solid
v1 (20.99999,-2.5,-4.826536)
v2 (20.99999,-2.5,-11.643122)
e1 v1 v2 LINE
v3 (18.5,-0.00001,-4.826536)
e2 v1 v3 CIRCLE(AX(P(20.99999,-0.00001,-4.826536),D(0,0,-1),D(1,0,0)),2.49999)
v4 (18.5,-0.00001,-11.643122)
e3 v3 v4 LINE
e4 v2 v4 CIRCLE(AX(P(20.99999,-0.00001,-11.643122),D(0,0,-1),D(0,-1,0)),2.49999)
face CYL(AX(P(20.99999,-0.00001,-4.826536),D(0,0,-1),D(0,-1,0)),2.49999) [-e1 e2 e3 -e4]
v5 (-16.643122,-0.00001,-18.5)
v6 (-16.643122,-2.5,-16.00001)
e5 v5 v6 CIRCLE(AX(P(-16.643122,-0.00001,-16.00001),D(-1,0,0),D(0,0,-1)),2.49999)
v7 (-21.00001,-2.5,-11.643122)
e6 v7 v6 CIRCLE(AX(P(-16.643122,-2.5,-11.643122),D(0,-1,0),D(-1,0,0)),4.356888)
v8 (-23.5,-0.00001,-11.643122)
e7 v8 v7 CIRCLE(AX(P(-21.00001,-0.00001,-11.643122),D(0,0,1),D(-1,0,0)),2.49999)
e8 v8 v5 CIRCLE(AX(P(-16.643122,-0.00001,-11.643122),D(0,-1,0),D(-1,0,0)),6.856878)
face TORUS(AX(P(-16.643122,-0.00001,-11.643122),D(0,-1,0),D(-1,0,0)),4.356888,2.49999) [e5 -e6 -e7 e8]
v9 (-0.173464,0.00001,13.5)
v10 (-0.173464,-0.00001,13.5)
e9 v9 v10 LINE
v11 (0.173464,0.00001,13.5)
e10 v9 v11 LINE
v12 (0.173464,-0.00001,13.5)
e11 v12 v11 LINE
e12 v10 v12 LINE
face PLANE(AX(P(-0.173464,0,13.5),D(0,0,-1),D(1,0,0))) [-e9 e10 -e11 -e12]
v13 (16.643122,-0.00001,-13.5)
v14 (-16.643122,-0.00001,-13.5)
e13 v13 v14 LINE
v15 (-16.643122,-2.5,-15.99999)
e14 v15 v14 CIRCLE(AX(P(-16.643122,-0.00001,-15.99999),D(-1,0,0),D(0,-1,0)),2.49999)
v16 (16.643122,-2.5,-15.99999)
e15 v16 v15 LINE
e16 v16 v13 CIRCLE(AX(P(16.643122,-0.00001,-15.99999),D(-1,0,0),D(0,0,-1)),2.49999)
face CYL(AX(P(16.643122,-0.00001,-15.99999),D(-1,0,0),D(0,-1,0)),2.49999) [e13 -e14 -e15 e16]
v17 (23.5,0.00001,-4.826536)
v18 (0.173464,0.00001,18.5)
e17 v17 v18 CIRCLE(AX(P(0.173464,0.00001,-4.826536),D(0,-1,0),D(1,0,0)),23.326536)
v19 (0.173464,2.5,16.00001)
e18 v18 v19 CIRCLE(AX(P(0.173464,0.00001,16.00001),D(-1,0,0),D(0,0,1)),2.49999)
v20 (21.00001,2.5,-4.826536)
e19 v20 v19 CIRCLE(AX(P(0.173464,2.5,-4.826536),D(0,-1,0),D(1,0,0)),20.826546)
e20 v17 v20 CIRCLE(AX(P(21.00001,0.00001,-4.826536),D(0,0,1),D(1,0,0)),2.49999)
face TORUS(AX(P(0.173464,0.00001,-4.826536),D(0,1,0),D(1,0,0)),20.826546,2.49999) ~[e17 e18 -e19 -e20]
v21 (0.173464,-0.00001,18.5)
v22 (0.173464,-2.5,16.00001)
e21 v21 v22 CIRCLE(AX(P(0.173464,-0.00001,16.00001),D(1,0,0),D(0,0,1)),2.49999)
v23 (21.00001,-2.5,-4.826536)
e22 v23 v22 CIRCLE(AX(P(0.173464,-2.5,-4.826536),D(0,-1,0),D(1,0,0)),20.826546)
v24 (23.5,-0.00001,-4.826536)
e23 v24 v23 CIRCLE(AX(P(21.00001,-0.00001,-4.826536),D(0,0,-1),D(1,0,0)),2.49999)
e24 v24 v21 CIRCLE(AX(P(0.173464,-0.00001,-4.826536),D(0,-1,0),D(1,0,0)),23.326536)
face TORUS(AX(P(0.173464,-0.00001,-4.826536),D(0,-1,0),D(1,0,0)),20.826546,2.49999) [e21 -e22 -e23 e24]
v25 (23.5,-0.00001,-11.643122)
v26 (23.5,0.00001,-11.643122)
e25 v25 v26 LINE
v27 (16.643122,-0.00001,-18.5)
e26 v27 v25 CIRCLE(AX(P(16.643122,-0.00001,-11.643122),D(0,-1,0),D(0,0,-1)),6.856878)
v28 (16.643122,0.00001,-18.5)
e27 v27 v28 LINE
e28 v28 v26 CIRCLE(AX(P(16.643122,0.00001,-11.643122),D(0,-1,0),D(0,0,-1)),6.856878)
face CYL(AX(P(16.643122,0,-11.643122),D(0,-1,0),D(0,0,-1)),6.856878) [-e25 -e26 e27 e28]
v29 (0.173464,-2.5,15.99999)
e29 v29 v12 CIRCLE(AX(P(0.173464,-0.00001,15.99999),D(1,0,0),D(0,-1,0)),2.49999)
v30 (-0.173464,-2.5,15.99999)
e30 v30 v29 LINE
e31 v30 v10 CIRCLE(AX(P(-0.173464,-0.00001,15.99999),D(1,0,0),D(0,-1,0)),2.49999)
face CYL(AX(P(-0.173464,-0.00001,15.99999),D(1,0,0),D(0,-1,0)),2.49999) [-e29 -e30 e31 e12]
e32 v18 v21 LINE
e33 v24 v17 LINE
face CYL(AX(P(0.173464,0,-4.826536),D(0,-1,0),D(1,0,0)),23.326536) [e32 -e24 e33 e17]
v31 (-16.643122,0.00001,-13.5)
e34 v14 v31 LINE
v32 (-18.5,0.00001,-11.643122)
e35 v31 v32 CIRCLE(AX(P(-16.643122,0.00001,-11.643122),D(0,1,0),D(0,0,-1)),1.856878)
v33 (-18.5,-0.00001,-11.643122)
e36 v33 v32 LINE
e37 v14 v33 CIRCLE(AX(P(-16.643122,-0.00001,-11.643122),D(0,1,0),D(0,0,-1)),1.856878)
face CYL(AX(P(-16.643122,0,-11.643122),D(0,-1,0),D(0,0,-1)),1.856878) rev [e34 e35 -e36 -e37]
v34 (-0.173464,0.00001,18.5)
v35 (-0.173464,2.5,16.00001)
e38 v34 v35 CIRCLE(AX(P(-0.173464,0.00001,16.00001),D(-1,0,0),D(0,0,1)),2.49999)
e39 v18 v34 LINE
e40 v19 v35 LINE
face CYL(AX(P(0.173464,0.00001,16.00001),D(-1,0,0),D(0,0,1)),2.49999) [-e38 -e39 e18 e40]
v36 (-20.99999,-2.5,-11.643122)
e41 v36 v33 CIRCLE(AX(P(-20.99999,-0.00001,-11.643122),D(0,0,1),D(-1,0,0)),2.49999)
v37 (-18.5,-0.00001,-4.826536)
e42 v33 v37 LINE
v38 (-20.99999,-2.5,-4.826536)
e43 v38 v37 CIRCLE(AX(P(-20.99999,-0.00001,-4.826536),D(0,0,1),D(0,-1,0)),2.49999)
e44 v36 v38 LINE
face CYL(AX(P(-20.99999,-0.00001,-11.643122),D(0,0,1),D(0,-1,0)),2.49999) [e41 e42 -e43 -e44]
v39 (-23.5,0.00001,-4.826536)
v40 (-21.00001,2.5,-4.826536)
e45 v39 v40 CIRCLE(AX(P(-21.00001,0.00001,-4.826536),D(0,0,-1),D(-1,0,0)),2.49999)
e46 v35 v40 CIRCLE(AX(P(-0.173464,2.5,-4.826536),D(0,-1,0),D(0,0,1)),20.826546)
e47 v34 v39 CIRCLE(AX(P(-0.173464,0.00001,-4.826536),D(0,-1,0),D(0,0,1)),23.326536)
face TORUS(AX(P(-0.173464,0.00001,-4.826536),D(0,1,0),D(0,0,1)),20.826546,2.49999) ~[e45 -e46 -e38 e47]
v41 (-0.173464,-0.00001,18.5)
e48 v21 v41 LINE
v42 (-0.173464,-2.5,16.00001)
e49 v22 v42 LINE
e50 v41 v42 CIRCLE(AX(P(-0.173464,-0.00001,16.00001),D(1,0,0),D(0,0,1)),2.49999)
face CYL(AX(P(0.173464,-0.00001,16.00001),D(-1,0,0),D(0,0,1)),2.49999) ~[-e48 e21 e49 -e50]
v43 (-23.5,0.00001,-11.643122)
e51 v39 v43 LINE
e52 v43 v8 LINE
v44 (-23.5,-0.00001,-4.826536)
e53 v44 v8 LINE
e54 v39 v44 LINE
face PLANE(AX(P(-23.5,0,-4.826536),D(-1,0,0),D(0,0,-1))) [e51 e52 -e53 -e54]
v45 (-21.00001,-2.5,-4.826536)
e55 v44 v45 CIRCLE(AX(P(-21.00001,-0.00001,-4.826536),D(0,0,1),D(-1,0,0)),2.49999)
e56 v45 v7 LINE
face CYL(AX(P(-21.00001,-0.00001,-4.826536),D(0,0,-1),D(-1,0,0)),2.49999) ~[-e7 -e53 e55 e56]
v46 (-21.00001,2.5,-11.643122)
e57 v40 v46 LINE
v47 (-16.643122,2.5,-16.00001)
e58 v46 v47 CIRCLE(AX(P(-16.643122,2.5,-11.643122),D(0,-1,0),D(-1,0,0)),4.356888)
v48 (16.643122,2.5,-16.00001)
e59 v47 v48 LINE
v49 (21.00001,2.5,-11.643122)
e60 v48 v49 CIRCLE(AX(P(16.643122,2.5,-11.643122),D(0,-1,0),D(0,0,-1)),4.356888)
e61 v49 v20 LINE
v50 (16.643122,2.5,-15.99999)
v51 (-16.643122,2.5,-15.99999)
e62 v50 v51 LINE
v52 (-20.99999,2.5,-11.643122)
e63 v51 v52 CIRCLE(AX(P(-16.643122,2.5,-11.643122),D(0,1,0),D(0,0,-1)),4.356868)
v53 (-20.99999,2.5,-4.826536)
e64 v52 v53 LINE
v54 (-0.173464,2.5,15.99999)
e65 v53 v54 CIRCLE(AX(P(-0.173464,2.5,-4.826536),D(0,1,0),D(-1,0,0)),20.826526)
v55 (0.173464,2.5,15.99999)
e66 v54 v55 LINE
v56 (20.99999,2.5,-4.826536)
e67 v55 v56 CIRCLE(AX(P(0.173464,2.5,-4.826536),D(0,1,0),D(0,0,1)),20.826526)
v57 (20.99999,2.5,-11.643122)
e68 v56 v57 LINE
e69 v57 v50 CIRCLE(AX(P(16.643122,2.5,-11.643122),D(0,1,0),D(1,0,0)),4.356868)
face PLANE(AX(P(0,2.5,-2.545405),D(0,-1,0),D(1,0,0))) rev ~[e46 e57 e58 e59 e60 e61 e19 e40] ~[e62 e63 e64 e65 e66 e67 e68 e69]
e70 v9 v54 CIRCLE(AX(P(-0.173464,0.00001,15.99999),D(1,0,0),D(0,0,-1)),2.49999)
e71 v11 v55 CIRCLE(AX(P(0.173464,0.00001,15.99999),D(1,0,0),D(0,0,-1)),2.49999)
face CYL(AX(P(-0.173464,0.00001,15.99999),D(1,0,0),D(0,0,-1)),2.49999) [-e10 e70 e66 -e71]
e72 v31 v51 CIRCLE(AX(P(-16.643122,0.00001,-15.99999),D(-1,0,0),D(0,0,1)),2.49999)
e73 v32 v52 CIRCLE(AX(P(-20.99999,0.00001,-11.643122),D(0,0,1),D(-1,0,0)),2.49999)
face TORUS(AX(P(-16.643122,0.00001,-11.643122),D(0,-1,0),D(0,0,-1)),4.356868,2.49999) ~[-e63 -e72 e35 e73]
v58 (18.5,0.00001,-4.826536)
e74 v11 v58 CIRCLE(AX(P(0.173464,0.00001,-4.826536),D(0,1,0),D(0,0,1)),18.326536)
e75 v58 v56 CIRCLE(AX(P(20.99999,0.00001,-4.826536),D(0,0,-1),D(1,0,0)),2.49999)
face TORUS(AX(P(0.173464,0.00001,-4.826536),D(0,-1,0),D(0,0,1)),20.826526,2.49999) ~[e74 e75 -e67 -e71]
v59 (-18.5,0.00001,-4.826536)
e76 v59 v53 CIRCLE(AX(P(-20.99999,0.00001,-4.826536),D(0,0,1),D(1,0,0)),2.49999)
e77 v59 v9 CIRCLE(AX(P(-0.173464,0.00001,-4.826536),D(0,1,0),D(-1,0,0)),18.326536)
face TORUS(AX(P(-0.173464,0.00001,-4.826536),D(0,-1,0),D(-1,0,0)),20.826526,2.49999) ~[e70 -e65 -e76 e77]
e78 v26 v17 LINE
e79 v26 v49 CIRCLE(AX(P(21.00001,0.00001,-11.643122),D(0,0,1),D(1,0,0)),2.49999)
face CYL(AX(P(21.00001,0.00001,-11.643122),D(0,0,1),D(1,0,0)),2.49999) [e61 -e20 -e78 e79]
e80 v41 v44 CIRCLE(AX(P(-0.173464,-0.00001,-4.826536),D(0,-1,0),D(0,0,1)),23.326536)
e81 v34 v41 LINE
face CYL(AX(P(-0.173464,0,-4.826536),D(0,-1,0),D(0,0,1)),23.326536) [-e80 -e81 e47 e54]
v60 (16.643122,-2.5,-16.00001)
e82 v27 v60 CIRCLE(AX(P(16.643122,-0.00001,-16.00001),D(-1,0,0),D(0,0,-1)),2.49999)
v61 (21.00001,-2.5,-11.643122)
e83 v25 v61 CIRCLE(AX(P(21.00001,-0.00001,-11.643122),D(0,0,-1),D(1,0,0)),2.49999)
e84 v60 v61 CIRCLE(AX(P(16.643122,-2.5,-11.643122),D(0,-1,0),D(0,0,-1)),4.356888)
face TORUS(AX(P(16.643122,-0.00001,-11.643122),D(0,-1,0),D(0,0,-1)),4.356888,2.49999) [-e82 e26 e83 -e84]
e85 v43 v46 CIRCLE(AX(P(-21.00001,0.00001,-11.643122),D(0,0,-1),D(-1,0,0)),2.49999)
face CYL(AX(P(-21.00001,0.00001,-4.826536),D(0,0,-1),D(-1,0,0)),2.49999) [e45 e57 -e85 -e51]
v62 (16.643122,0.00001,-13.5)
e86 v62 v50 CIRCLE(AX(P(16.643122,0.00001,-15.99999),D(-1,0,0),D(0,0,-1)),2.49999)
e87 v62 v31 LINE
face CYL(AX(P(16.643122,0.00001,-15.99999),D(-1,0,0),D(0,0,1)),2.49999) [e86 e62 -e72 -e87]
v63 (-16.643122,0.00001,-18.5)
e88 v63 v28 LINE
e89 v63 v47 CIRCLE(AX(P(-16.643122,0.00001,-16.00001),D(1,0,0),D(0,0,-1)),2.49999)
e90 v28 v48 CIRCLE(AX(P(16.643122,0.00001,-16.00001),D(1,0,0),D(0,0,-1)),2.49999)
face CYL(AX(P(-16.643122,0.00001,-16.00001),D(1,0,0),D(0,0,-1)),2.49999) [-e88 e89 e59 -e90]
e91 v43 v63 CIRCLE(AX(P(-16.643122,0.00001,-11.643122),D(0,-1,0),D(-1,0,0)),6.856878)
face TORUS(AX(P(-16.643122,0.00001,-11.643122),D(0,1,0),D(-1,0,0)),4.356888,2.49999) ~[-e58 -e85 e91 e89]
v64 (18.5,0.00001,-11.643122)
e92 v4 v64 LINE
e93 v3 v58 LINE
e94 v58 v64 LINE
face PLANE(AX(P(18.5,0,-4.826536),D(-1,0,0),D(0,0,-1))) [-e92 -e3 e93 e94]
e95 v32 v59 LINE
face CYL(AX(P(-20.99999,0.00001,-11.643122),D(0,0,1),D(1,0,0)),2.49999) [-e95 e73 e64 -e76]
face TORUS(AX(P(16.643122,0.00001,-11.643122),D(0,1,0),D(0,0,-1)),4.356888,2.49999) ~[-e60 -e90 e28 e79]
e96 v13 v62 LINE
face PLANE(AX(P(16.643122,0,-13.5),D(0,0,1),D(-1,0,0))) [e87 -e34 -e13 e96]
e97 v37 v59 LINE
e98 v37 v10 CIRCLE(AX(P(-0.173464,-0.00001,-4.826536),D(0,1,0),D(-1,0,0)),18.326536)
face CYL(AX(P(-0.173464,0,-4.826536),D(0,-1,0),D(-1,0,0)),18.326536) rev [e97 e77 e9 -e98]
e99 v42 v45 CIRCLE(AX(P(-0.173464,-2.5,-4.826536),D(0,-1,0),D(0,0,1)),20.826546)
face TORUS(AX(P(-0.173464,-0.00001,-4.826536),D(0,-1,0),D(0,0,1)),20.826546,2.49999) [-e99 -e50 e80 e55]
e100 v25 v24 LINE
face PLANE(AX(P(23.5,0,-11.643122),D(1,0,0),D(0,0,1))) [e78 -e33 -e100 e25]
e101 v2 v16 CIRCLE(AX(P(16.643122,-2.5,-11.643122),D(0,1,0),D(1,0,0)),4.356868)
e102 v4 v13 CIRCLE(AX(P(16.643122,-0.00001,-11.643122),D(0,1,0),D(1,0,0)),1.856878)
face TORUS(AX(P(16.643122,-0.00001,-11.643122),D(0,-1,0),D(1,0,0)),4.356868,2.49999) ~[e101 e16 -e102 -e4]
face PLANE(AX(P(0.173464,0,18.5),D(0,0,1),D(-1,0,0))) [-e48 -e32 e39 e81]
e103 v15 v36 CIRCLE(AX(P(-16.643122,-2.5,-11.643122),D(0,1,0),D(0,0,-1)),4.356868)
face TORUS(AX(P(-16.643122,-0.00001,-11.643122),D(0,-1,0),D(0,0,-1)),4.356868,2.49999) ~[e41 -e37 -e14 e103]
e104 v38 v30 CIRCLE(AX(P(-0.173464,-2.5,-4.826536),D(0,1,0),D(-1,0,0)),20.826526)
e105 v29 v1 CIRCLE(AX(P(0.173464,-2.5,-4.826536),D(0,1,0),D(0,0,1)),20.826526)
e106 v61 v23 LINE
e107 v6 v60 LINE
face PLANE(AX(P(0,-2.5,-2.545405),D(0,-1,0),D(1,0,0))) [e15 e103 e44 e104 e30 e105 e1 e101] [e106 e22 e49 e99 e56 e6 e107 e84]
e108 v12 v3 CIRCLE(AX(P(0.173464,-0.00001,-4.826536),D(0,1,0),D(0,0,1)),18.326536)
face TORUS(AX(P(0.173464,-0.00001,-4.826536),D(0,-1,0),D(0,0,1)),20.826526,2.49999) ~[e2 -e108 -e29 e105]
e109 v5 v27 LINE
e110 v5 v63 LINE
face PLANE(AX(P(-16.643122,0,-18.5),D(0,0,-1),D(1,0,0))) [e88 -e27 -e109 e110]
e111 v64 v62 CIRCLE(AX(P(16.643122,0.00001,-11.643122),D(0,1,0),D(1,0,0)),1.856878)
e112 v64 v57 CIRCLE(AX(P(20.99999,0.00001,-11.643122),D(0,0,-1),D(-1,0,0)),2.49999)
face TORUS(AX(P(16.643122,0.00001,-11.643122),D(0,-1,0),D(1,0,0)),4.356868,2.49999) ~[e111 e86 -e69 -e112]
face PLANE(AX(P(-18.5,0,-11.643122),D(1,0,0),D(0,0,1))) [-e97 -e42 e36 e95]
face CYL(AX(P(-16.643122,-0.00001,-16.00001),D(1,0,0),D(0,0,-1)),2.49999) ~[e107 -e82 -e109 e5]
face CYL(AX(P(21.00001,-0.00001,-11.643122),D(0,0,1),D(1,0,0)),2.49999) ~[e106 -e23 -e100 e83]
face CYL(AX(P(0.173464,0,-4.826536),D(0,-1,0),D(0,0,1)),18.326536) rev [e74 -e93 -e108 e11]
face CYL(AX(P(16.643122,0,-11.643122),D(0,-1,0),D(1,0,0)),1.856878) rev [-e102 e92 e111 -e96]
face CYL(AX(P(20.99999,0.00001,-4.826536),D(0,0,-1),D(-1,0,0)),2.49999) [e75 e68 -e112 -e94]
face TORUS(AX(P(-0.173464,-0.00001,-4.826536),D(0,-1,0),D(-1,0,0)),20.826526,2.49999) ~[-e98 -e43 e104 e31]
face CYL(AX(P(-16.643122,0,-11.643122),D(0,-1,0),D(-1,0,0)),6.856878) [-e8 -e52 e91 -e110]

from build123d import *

# Parameters (mm, degrees)
F1_DEPTH = 2.5
F2_R     = 2.49999


# Not quite as in the source:
# - a fillet or chamfer is up to 0.001 mm smaller than in the source, because OpenCascade refuses the exact size


with BuildPart() as f1:
    # F0 (on Front) → F1 (new body, symmetric)
    with BuildSketch(Plane.XZ):
        with BuildLine():
            ThreePointArc((23.5, -4.8265362185), (16.6678157232, 11.6678157232), (0.1734637815, 18.5))
            Line((0.1734637815, 18.5), (-0.1734637815, 18.5))
            ThreePointArc((-0.1734637815, 18.5), (-16.6678157232, 11.6678157232), (-23.5, -4.8265362185))
            Line((-23.5, -4.8265362185), (-23.5, -11.6431219986))
            ThreePointArc((-23.5, -11.6431219986), (-21.4916669312, -16.4916669312), (-16.6431219986, -18.5))
            Line((-16.6431219986, -18.5), (16.6431219986, -18.5))
            ThreePointArc((16.6431219986, -18.5), (21.4916669312, -16.4916669312), (23.5, -11.6431219986))
            Line((23.5, -11.6431219986), (23.5, -4.8265362185))
        make_face()
        with BuildLine():
            Line((-0.1734637815, 13.4999999712), (0.1734637815, 13.4999999712))
            ThreePointArc((0.1734637815, 13.4999999712), (13.1322817969, 8.1322817969), (18.4999999712, -4.8265362185))
            Line((18.4999999712, -4.8265362185), (18.4999999712, -11.6431219986))
            ThreePointArc((18.4999999712, -11.6431219986), (17.9561330049, -12.9561330049), (16.6431219986, -13.4999999712))
            Line((16.6431219986, -13.4999999712), (-16.6431219986, -13.4999999712))
            ThreePointArc((-16.6431219986, -13.4999999712), (-17.9561330049, -12.9561330049), (-18.4999999712, -11.6431219986))
            Line((-18.4999999712, -11.6431219986), (-18.4999999712, -4.8265362185))
            ThreePointArc((-18.4999999712, -4.8265362185), (-13.1322817969, 8.1322817969), (-0.1734637815, 13.4999999712))
        make_face(mode=Mode.SUBTRACT)
    extrude(amount=F1_DEPTH, both=True)

    # F2 (radius 2.5 in the source; OpenCascade refuses exactly that, so slightly less here)
    f2_edges = [f1.edges().sort_by_distance(p)[0] for p in [
        (21.491667, 2.5, -16.491667),
        (23.5, 2.5, -8.234829),
        (16.667816, 2.5, 11.667816),
        (0, 2.5, 18.5),
        (-16.667816, 2.5, 11.667816),
        (-23.5, 2.5, -8.234829),
        (-21.491667, 2.5, -16.491667),
        (0, 2.5, -18.5),
        (0, 2.5, 13.5),
        (13.132282, 2.5, 8.132282),
        (18.5, 2.5, -8.234829),
        (17.956133, 2.5, -12.956133),
        (0, 2.5, -13.5),
        (-17.956133, 2.5, -12.956133),
        (-18.5, 2.5, -8.234829),
        (-13.132282, 2.5, 8.132282),
        (21.491667, -2.5, -16.491667),
        (23.5, -2.5, -8.234829),
        (16.667816, -2.5, 11.667816),
        (0, -2.5, 18.5),
        (-16.667816, -2.5, 11.667816),
        (-23.5, -2.5, -8.234829),
        (-21.491667, -2.5, -16.491667),
        (0, -2.5, -18.5),
        (0, -2.5, 13.5),
        (13.132282, -2.5, 8.132282),
        (18.5, -2.5, -8.234829),
        (17.956133, -2.5, -12.956133),
        (0, -2.5, -13.5),
        (-17.956133, -2.5, -12.956133),
        (-18.5, -2.5, -8.234829),
        (-13.132282, -2.5, 8.132282),
    ]]
    fillet(f2_edges, radius=F2_R)


solid = f1.part
